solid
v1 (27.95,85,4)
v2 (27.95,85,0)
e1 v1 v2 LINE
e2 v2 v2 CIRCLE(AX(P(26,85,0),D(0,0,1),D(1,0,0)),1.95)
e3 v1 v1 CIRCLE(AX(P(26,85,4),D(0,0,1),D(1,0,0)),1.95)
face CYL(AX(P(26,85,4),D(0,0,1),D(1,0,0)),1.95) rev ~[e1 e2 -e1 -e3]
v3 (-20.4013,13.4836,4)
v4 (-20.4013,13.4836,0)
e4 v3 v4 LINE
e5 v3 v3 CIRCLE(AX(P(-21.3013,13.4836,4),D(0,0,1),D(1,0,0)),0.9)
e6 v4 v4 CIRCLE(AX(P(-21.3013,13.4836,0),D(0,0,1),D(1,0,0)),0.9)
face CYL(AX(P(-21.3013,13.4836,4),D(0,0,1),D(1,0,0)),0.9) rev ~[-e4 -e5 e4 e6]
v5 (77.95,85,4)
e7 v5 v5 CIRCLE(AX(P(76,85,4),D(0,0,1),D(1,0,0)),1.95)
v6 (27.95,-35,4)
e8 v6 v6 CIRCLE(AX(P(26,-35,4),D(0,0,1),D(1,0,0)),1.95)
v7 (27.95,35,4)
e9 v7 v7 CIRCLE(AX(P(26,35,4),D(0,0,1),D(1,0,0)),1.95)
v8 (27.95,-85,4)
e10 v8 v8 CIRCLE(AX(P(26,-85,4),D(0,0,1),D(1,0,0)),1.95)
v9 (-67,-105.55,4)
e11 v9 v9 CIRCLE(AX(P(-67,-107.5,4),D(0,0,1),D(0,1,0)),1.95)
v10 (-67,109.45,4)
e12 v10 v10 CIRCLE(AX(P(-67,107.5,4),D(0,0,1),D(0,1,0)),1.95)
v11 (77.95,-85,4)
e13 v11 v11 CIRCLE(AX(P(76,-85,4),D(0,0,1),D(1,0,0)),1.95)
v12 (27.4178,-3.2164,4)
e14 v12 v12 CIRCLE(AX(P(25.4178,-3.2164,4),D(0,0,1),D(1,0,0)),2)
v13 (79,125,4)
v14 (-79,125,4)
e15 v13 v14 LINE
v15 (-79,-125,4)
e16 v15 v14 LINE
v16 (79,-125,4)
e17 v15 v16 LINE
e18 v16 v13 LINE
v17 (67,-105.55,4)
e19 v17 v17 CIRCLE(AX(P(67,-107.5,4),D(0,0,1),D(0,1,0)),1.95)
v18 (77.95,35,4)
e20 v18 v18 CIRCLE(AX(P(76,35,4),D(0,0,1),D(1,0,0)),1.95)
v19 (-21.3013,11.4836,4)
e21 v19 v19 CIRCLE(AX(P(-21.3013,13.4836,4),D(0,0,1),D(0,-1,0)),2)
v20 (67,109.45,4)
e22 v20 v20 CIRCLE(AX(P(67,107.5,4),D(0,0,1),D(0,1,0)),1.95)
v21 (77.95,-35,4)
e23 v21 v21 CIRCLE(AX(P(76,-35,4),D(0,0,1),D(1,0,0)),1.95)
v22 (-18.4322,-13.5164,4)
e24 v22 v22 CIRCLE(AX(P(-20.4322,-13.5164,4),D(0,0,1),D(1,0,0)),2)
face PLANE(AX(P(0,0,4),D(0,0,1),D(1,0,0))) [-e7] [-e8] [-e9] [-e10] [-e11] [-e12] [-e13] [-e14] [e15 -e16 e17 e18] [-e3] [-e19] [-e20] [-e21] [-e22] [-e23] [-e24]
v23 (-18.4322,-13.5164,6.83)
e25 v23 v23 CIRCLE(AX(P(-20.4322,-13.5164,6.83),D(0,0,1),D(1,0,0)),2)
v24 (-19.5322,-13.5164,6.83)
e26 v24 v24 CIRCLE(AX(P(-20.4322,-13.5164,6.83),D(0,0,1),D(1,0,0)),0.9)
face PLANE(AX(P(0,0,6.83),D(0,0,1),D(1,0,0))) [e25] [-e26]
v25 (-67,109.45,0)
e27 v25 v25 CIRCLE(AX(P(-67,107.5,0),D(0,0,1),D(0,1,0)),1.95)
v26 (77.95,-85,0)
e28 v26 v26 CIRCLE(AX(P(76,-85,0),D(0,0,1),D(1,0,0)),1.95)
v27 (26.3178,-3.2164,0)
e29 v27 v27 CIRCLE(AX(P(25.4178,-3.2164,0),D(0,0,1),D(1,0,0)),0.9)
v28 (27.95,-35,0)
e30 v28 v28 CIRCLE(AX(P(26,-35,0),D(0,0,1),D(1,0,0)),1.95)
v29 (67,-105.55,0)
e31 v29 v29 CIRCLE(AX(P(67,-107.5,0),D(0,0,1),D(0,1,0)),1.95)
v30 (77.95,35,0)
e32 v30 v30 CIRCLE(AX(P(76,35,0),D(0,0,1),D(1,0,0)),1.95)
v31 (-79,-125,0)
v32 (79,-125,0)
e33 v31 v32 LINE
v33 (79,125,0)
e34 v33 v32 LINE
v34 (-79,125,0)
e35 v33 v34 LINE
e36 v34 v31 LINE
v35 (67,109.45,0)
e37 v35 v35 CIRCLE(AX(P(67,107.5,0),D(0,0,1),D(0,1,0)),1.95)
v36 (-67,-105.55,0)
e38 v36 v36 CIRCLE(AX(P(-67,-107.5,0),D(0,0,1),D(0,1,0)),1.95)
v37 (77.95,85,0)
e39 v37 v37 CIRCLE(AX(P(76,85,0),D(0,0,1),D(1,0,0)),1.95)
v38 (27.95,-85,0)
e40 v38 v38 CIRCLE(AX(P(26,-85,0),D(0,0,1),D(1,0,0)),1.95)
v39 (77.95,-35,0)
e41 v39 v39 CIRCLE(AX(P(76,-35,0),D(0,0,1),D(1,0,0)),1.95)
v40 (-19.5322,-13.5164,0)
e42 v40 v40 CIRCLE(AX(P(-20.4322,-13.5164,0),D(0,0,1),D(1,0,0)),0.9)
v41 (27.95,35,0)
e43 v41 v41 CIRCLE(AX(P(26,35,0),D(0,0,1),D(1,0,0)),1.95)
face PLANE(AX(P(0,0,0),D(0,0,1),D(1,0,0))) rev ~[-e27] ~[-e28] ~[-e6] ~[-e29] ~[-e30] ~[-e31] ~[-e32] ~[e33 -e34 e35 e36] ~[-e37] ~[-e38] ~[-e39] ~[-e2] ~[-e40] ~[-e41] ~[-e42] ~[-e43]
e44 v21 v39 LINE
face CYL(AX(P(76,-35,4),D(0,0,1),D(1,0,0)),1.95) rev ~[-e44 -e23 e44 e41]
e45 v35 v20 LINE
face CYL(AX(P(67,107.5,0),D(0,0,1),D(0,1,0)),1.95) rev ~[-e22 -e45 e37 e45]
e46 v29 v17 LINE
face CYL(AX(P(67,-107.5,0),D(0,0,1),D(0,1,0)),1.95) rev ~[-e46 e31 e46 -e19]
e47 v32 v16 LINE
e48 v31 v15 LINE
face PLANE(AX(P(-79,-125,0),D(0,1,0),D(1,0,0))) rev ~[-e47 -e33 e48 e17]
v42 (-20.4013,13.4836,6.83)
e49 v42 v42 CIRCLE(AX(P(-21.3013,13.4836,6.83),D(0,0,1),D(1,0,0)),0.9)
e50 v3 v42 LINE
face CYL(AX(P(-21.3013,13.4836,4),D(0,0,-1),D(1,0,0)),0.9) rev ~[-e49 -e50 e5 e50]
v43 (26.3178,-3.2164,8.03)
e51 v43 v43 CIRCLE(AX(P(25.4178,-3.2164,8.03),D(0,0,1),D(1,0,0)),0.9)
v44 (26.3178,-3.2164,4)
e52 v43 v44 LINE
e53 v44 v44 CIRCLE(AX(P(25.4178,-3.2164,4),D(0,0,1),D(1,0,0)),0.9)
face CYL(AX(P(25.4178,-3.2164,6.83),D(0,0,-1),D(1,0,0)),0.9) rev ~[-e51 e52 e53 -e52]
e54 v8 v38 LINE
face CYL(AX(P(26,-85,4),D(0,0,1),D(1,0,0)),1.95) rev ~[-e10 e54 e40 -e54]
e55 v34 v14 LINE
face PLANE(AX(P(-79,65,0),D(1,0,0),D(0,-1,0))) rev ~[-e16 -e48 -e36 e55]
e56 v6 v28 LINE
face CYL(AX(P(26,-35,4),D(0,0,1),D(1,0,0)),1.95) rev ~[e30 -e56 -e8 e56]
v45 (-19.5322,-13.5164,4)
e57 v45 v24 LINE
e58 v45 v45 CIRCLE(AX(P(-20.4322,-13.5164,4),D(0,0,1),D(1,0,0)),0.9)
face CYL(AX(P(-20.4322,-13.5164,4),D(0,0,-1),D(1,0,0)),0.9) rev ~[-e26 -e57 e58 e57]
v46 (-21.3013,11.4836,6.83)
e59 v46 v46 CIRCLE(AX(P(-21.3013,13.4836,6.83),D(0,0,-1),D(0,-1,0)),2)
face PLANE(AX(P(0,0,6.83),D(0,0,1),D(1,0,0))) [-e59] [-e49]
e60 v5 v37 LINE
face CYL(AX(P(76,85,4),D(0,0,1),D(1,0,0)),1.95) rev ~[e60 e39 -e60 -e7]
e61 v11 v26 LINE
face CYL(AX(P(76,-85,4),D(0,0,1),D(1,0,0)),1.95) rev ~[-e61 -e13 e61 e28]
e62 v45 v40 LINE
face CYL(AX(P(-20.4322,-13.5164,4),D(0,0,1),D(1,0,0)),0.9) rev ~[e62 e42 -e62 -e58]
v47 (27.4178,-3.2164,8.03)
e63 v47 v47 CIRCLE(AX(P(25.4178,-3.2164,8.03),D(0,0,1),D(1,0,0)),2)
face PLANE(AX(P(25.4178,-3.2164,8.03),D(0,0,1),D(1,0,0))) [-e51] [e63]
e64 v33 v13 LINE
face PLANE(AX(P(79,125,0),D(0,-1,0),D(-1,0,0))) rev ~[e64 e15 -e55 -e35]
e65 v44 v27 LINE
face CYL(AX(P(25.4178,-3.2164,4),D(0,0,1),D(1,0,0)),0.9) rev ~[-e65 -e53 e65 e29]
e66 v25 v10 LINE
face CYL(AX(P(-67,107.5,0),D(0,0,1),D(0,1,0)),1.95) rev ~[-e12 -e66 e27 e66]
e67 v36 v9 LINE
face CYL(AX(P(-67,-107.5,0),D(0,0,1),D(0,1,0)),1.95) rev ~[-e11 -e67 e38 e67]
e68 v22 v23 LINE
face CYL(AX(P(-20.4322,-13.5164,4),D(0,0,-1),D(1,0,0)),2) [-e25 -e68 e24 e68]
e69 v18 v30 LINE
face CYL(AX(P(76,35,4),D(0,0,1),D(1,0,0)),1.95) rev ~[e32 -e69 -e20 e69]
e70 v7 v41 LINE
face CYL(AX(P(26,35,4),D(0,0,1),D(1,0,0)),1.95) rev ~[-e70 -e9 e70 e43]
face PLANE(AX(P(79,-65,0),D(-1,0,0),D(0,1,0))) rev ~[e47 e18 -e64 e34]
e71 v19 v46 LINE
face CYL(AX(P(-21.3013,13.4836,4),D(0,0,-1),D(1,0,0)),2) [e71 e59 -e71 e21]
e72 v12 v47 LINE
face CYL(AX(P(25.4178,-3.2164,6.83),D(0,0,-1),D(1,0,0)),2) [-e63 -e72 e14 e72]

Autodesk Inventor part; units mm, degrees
ref_plane "YZ Plane" through (0, 0, 0) normal (1, 0, 0) x (0, 1, 0)
ref_plane "XZ Plane" through (0, 0, 0) normal (0, 1, 0) x (-1, 0, 0)
ref_plane "Work Plane1" through (0, 0, 0) normal (0, 0, 1) x (1, 0, 0)
sketch "Sketch1" plane through (0, 0, 0) normal (0, 0, 1) x (1, 0, 0)
  arc A0 (80, 65) -> (65, 80) centre (65, 65) ccw projected
  line L0 (80, 65) -> (80, -65) projected
  arc A1 (65, -80) -> (80, -65) centre (65, -65) ccw projected
  line L1 (65, -80) -> (-65, -80) projected
  arc A2 (-80, -65) -> (-65, -80) centre (-65, -65) ccw projected
  line L2 (-80, -65) -> (-80, 65) projected
  arc A3 (-65, 80) -> (-80, 65) centre (-65, 65) ccw projected
  line L3 (-65, 80) -> (65, 80) projected
  line L4 (-150, -150) -> (150, -150) projected
  line L5 (150, -150) -> (150, 150) projected
  line L6 (150, 150) -> (-150, 150) projected
  line L7 (-150, 150) -> (-150, -150) projected
  line L8 (79, -65) -> (79, 65)
  arc A4 (79, 65) -> (65, 79) centre (65, 65) ccw
  line L9 (65, 79) -> (-65, 79)
  arc A5 (-65, 79) -> (-79, 65) centre (-65, 65) ccw
  line L10 (-79, 65) -> (-79, -65)
  arc A6 (-79, -65) -> (-65, -79) centre (-65, -65) ccw
  line L11 (-65, -79) -> (65, -79)
  arc A7 (65, -79) -> (79, -65) centre (65, -65) ccw
  circle A8 centre (-67, -107.5) radius 1.95 projected
  circle A9 centre (67, 107.5) radius 1.95 projected
  circle A10 centre (-67, 107.5) radius 1.95 projected
  circle A11 centre (67, -107.5) radius 1.95 projected
  point P0 (0, 0)
  dimension "d0" = 1
ref_plane "Work Plane3" through (0, 0, 0) normal (0, 0, 1) x (1, 0, 0)
sketch "Sketch2" plane through (0, 0, 0) normal (0, 0, 1) x (1, 0, 0)
  line L0 (79, -65) -> (79, 65) projected
  arc A0 (79, 65) -> (65, 79) centre (65, 65) ccw projected
  line L1 (65, 79) -> (-65, 79) projected
  arc A1 (-65, 79) -> (-79, 65) centre (-65, 65) ccw projected
  line L2 (-79, 65) -> (-79, -65) projected
  arc A2 (-79, -65) -> (-65, -79) centre (-65, -65) ccw projected
  line L3 (-65, -79) -> (65, -79) projected
  arc A3 (65, -79) -> (79, -65) centre (65, -65) ccw projected
  line L4 (-79, -125) -> (79, -125)
  line L5 (79, -125) -> (79, 125)
  line L6 (79, 125) -> (-79, 125)
  line L7 (-79, 125) -> (-79, -125)
  line L8 (-79, -125) -> (79, 125) construction
  line L9 (79, -125) -> (-79, 125) construction
  point P0 (0, 0)
  dimension "d3" = 250
extrude "Extrusion2" add sketch "Sketch2" along normal blind 4
ref_plane "Work Plane2" through (-26.5401, 7.7836, 6.83) normal (0, 0, -1) x (0, 1, 0)
sketch "Sketch3" plane through (0, 0, 4) normal (0, 0, 1) x (1, 0, 0)
  arc A0 (-22.3322, 15.5836) -> (-25.0072, 11.4836) centre (-3.6319, 0.4603) ccw
  line L0 (-21.3013, 11.4836) -> (-25.0072, 11.4836)
  arc A1 (-21.3013, 11.4836) -> (-20.1013, 15.0836) centre (-21.3013, 13.4836) ccw
  line L1 (-20.1013, 15.5836) -> (-20.1013, 15.0836)
  line L2 (-22.3322, 15.5836) -> (-20.1013, 15.5836)
  circle A2 centre (-21.3013, 13.4836) radius 0.9
  circle A3 centre (6.0928, 10.7836) radius 1.575
  circle A4 centre (6.0928, 10.7836) radius 0.7
  circle A5 centre (4.2678, -11.3664) radius 1.575
  circle A6 centre (4.2678, -11.3664) radius 0.7
  circle A7 centre (-21.3013, 13.4836) radius 0.9
  circle A8 centre (-21.3013, 13.4836) radius 2
  circle A9 centre (25.4178, -3.2164) radius 0.9
  circle A10 centre (-20.4322, -13.5164) radius 0.9
  circle A11 centre (-20.4322, -13.5164) radius 2
  circle A12 centre (25.4178, -3.2164) radius 2
  point P0 (0, 0)
extrude "Extrusion3" add sketch "Sketch3" along normal up to surface (2.83 mm away) contours A8 A1 | A11 | A12
sketch "Sketch4" plane through (25.4178, -3.2164, 6.83) normal (0, 0, 1) x (1, 0, 0)
  circle A0 centre (0, 0) radius 2 projected
  circle A1 centre (0, 0) radius 0.9 projected
  point P0 (-25.4178, 3.2164)
extrude "Extrusion4" add sketch "Sketch4" along normal up to surface (1.2 mm away)
sketch "Sketch5" plane through (0, 0, 4) normal (0, 0, 1) x (1, 0, 0)
  circle A0 centre (-20.4322, -13.5164) radius 2 projected
  circle A1 centre (-20.4322, -13.5164) radius 0.9 projected
  circle A2 centre (-21.3013, 13.4836) radius 0.9 projected
  circle A3 centre (25.4178, -3.2164) radius 0.9 projected
  point P0 (0, 0)
extrude "Extrusion5" cut sketch "Sketch5" against normal through all contours A1 | A2 | A3
sketch "Sketch6" plane through (0, 0, 4) normal (0, 0, 1) x (1, 0, 0)
  circle A0 centre (76, -85) radius 1.95 projected
  circle A1 centre (26, -85) radius 1.95 projected
  circle A2 centre (26, -35) radius 1.95 projected
  circle A3 centre (76, -35) radius 1.95 projected
  circle A4 centre (76, 35) radius 1.95 projected
  circle A5 centre (26, 35) radius 1.95 projected
  circle A6 centre (76, 85) radius 1.95 projected
  circle A7 centre (26, 85) radius 1.95 projected
  point P0 (0, 0)
extrude "Extrusion6" cut sketch "Sketch6" against normal through all
sketch "Sketch7" plane through (0, 0, 0) normal (0, 0, -1) x (-1, 0, 0)
  circle A0 centre (-76, 85) radius 1.95 projected
  circle A1 centre (-76, 35) radius 1.95 projected
  circle A2 centre (-26, -35) radius 1.95 projected
  circle A3 centre (-76, -85) radius 1.95 projected
  circle A4 centre (-26, -85) radius 1.95 projected
  circle A5 centre (-76, -35) radius 1.95 projected
  circle A6 centre (-26, 35) radius 1.95 projected
  circle A7 centre (-26, 85) radius 1.95 projected
  line L0 (79, -125) -> (-79, -125) projected
  line L1 (79, 125) -> (79, -125) projected
  line L2 (-79, 125) -> (79, 125) projected
  line L3 (-79, -125) -> (-79, 125) projected
  line L4 (67, -107.5) -> (-67, -107.5)
  line L5 (-67, -107.5) -> (-67, 107.5)
  line L6 (-67, 107.5) -> (67, 107.5)
  line L7 (67, 107.5) -> (67, -107.5)
  line L8 (67, -107.5) -> (-67, 107.5) construction
  line L9 (-67, -107.5) -> (67, 107.5) construction
  point P0 (0, 0)
  dimension "d16" = 134
  dimension "d17" = 215
hole "Hole1" at (-67, 107.5, 0) at (67, 107.5, 0) at (67, -107.5, 0) at (-67, -107.5, 0) direction (0, 0, 1) diameter 3.9 depth 10 tip angle 118
properties part number "01_Zeiss_Axiotech_adapterplate"
